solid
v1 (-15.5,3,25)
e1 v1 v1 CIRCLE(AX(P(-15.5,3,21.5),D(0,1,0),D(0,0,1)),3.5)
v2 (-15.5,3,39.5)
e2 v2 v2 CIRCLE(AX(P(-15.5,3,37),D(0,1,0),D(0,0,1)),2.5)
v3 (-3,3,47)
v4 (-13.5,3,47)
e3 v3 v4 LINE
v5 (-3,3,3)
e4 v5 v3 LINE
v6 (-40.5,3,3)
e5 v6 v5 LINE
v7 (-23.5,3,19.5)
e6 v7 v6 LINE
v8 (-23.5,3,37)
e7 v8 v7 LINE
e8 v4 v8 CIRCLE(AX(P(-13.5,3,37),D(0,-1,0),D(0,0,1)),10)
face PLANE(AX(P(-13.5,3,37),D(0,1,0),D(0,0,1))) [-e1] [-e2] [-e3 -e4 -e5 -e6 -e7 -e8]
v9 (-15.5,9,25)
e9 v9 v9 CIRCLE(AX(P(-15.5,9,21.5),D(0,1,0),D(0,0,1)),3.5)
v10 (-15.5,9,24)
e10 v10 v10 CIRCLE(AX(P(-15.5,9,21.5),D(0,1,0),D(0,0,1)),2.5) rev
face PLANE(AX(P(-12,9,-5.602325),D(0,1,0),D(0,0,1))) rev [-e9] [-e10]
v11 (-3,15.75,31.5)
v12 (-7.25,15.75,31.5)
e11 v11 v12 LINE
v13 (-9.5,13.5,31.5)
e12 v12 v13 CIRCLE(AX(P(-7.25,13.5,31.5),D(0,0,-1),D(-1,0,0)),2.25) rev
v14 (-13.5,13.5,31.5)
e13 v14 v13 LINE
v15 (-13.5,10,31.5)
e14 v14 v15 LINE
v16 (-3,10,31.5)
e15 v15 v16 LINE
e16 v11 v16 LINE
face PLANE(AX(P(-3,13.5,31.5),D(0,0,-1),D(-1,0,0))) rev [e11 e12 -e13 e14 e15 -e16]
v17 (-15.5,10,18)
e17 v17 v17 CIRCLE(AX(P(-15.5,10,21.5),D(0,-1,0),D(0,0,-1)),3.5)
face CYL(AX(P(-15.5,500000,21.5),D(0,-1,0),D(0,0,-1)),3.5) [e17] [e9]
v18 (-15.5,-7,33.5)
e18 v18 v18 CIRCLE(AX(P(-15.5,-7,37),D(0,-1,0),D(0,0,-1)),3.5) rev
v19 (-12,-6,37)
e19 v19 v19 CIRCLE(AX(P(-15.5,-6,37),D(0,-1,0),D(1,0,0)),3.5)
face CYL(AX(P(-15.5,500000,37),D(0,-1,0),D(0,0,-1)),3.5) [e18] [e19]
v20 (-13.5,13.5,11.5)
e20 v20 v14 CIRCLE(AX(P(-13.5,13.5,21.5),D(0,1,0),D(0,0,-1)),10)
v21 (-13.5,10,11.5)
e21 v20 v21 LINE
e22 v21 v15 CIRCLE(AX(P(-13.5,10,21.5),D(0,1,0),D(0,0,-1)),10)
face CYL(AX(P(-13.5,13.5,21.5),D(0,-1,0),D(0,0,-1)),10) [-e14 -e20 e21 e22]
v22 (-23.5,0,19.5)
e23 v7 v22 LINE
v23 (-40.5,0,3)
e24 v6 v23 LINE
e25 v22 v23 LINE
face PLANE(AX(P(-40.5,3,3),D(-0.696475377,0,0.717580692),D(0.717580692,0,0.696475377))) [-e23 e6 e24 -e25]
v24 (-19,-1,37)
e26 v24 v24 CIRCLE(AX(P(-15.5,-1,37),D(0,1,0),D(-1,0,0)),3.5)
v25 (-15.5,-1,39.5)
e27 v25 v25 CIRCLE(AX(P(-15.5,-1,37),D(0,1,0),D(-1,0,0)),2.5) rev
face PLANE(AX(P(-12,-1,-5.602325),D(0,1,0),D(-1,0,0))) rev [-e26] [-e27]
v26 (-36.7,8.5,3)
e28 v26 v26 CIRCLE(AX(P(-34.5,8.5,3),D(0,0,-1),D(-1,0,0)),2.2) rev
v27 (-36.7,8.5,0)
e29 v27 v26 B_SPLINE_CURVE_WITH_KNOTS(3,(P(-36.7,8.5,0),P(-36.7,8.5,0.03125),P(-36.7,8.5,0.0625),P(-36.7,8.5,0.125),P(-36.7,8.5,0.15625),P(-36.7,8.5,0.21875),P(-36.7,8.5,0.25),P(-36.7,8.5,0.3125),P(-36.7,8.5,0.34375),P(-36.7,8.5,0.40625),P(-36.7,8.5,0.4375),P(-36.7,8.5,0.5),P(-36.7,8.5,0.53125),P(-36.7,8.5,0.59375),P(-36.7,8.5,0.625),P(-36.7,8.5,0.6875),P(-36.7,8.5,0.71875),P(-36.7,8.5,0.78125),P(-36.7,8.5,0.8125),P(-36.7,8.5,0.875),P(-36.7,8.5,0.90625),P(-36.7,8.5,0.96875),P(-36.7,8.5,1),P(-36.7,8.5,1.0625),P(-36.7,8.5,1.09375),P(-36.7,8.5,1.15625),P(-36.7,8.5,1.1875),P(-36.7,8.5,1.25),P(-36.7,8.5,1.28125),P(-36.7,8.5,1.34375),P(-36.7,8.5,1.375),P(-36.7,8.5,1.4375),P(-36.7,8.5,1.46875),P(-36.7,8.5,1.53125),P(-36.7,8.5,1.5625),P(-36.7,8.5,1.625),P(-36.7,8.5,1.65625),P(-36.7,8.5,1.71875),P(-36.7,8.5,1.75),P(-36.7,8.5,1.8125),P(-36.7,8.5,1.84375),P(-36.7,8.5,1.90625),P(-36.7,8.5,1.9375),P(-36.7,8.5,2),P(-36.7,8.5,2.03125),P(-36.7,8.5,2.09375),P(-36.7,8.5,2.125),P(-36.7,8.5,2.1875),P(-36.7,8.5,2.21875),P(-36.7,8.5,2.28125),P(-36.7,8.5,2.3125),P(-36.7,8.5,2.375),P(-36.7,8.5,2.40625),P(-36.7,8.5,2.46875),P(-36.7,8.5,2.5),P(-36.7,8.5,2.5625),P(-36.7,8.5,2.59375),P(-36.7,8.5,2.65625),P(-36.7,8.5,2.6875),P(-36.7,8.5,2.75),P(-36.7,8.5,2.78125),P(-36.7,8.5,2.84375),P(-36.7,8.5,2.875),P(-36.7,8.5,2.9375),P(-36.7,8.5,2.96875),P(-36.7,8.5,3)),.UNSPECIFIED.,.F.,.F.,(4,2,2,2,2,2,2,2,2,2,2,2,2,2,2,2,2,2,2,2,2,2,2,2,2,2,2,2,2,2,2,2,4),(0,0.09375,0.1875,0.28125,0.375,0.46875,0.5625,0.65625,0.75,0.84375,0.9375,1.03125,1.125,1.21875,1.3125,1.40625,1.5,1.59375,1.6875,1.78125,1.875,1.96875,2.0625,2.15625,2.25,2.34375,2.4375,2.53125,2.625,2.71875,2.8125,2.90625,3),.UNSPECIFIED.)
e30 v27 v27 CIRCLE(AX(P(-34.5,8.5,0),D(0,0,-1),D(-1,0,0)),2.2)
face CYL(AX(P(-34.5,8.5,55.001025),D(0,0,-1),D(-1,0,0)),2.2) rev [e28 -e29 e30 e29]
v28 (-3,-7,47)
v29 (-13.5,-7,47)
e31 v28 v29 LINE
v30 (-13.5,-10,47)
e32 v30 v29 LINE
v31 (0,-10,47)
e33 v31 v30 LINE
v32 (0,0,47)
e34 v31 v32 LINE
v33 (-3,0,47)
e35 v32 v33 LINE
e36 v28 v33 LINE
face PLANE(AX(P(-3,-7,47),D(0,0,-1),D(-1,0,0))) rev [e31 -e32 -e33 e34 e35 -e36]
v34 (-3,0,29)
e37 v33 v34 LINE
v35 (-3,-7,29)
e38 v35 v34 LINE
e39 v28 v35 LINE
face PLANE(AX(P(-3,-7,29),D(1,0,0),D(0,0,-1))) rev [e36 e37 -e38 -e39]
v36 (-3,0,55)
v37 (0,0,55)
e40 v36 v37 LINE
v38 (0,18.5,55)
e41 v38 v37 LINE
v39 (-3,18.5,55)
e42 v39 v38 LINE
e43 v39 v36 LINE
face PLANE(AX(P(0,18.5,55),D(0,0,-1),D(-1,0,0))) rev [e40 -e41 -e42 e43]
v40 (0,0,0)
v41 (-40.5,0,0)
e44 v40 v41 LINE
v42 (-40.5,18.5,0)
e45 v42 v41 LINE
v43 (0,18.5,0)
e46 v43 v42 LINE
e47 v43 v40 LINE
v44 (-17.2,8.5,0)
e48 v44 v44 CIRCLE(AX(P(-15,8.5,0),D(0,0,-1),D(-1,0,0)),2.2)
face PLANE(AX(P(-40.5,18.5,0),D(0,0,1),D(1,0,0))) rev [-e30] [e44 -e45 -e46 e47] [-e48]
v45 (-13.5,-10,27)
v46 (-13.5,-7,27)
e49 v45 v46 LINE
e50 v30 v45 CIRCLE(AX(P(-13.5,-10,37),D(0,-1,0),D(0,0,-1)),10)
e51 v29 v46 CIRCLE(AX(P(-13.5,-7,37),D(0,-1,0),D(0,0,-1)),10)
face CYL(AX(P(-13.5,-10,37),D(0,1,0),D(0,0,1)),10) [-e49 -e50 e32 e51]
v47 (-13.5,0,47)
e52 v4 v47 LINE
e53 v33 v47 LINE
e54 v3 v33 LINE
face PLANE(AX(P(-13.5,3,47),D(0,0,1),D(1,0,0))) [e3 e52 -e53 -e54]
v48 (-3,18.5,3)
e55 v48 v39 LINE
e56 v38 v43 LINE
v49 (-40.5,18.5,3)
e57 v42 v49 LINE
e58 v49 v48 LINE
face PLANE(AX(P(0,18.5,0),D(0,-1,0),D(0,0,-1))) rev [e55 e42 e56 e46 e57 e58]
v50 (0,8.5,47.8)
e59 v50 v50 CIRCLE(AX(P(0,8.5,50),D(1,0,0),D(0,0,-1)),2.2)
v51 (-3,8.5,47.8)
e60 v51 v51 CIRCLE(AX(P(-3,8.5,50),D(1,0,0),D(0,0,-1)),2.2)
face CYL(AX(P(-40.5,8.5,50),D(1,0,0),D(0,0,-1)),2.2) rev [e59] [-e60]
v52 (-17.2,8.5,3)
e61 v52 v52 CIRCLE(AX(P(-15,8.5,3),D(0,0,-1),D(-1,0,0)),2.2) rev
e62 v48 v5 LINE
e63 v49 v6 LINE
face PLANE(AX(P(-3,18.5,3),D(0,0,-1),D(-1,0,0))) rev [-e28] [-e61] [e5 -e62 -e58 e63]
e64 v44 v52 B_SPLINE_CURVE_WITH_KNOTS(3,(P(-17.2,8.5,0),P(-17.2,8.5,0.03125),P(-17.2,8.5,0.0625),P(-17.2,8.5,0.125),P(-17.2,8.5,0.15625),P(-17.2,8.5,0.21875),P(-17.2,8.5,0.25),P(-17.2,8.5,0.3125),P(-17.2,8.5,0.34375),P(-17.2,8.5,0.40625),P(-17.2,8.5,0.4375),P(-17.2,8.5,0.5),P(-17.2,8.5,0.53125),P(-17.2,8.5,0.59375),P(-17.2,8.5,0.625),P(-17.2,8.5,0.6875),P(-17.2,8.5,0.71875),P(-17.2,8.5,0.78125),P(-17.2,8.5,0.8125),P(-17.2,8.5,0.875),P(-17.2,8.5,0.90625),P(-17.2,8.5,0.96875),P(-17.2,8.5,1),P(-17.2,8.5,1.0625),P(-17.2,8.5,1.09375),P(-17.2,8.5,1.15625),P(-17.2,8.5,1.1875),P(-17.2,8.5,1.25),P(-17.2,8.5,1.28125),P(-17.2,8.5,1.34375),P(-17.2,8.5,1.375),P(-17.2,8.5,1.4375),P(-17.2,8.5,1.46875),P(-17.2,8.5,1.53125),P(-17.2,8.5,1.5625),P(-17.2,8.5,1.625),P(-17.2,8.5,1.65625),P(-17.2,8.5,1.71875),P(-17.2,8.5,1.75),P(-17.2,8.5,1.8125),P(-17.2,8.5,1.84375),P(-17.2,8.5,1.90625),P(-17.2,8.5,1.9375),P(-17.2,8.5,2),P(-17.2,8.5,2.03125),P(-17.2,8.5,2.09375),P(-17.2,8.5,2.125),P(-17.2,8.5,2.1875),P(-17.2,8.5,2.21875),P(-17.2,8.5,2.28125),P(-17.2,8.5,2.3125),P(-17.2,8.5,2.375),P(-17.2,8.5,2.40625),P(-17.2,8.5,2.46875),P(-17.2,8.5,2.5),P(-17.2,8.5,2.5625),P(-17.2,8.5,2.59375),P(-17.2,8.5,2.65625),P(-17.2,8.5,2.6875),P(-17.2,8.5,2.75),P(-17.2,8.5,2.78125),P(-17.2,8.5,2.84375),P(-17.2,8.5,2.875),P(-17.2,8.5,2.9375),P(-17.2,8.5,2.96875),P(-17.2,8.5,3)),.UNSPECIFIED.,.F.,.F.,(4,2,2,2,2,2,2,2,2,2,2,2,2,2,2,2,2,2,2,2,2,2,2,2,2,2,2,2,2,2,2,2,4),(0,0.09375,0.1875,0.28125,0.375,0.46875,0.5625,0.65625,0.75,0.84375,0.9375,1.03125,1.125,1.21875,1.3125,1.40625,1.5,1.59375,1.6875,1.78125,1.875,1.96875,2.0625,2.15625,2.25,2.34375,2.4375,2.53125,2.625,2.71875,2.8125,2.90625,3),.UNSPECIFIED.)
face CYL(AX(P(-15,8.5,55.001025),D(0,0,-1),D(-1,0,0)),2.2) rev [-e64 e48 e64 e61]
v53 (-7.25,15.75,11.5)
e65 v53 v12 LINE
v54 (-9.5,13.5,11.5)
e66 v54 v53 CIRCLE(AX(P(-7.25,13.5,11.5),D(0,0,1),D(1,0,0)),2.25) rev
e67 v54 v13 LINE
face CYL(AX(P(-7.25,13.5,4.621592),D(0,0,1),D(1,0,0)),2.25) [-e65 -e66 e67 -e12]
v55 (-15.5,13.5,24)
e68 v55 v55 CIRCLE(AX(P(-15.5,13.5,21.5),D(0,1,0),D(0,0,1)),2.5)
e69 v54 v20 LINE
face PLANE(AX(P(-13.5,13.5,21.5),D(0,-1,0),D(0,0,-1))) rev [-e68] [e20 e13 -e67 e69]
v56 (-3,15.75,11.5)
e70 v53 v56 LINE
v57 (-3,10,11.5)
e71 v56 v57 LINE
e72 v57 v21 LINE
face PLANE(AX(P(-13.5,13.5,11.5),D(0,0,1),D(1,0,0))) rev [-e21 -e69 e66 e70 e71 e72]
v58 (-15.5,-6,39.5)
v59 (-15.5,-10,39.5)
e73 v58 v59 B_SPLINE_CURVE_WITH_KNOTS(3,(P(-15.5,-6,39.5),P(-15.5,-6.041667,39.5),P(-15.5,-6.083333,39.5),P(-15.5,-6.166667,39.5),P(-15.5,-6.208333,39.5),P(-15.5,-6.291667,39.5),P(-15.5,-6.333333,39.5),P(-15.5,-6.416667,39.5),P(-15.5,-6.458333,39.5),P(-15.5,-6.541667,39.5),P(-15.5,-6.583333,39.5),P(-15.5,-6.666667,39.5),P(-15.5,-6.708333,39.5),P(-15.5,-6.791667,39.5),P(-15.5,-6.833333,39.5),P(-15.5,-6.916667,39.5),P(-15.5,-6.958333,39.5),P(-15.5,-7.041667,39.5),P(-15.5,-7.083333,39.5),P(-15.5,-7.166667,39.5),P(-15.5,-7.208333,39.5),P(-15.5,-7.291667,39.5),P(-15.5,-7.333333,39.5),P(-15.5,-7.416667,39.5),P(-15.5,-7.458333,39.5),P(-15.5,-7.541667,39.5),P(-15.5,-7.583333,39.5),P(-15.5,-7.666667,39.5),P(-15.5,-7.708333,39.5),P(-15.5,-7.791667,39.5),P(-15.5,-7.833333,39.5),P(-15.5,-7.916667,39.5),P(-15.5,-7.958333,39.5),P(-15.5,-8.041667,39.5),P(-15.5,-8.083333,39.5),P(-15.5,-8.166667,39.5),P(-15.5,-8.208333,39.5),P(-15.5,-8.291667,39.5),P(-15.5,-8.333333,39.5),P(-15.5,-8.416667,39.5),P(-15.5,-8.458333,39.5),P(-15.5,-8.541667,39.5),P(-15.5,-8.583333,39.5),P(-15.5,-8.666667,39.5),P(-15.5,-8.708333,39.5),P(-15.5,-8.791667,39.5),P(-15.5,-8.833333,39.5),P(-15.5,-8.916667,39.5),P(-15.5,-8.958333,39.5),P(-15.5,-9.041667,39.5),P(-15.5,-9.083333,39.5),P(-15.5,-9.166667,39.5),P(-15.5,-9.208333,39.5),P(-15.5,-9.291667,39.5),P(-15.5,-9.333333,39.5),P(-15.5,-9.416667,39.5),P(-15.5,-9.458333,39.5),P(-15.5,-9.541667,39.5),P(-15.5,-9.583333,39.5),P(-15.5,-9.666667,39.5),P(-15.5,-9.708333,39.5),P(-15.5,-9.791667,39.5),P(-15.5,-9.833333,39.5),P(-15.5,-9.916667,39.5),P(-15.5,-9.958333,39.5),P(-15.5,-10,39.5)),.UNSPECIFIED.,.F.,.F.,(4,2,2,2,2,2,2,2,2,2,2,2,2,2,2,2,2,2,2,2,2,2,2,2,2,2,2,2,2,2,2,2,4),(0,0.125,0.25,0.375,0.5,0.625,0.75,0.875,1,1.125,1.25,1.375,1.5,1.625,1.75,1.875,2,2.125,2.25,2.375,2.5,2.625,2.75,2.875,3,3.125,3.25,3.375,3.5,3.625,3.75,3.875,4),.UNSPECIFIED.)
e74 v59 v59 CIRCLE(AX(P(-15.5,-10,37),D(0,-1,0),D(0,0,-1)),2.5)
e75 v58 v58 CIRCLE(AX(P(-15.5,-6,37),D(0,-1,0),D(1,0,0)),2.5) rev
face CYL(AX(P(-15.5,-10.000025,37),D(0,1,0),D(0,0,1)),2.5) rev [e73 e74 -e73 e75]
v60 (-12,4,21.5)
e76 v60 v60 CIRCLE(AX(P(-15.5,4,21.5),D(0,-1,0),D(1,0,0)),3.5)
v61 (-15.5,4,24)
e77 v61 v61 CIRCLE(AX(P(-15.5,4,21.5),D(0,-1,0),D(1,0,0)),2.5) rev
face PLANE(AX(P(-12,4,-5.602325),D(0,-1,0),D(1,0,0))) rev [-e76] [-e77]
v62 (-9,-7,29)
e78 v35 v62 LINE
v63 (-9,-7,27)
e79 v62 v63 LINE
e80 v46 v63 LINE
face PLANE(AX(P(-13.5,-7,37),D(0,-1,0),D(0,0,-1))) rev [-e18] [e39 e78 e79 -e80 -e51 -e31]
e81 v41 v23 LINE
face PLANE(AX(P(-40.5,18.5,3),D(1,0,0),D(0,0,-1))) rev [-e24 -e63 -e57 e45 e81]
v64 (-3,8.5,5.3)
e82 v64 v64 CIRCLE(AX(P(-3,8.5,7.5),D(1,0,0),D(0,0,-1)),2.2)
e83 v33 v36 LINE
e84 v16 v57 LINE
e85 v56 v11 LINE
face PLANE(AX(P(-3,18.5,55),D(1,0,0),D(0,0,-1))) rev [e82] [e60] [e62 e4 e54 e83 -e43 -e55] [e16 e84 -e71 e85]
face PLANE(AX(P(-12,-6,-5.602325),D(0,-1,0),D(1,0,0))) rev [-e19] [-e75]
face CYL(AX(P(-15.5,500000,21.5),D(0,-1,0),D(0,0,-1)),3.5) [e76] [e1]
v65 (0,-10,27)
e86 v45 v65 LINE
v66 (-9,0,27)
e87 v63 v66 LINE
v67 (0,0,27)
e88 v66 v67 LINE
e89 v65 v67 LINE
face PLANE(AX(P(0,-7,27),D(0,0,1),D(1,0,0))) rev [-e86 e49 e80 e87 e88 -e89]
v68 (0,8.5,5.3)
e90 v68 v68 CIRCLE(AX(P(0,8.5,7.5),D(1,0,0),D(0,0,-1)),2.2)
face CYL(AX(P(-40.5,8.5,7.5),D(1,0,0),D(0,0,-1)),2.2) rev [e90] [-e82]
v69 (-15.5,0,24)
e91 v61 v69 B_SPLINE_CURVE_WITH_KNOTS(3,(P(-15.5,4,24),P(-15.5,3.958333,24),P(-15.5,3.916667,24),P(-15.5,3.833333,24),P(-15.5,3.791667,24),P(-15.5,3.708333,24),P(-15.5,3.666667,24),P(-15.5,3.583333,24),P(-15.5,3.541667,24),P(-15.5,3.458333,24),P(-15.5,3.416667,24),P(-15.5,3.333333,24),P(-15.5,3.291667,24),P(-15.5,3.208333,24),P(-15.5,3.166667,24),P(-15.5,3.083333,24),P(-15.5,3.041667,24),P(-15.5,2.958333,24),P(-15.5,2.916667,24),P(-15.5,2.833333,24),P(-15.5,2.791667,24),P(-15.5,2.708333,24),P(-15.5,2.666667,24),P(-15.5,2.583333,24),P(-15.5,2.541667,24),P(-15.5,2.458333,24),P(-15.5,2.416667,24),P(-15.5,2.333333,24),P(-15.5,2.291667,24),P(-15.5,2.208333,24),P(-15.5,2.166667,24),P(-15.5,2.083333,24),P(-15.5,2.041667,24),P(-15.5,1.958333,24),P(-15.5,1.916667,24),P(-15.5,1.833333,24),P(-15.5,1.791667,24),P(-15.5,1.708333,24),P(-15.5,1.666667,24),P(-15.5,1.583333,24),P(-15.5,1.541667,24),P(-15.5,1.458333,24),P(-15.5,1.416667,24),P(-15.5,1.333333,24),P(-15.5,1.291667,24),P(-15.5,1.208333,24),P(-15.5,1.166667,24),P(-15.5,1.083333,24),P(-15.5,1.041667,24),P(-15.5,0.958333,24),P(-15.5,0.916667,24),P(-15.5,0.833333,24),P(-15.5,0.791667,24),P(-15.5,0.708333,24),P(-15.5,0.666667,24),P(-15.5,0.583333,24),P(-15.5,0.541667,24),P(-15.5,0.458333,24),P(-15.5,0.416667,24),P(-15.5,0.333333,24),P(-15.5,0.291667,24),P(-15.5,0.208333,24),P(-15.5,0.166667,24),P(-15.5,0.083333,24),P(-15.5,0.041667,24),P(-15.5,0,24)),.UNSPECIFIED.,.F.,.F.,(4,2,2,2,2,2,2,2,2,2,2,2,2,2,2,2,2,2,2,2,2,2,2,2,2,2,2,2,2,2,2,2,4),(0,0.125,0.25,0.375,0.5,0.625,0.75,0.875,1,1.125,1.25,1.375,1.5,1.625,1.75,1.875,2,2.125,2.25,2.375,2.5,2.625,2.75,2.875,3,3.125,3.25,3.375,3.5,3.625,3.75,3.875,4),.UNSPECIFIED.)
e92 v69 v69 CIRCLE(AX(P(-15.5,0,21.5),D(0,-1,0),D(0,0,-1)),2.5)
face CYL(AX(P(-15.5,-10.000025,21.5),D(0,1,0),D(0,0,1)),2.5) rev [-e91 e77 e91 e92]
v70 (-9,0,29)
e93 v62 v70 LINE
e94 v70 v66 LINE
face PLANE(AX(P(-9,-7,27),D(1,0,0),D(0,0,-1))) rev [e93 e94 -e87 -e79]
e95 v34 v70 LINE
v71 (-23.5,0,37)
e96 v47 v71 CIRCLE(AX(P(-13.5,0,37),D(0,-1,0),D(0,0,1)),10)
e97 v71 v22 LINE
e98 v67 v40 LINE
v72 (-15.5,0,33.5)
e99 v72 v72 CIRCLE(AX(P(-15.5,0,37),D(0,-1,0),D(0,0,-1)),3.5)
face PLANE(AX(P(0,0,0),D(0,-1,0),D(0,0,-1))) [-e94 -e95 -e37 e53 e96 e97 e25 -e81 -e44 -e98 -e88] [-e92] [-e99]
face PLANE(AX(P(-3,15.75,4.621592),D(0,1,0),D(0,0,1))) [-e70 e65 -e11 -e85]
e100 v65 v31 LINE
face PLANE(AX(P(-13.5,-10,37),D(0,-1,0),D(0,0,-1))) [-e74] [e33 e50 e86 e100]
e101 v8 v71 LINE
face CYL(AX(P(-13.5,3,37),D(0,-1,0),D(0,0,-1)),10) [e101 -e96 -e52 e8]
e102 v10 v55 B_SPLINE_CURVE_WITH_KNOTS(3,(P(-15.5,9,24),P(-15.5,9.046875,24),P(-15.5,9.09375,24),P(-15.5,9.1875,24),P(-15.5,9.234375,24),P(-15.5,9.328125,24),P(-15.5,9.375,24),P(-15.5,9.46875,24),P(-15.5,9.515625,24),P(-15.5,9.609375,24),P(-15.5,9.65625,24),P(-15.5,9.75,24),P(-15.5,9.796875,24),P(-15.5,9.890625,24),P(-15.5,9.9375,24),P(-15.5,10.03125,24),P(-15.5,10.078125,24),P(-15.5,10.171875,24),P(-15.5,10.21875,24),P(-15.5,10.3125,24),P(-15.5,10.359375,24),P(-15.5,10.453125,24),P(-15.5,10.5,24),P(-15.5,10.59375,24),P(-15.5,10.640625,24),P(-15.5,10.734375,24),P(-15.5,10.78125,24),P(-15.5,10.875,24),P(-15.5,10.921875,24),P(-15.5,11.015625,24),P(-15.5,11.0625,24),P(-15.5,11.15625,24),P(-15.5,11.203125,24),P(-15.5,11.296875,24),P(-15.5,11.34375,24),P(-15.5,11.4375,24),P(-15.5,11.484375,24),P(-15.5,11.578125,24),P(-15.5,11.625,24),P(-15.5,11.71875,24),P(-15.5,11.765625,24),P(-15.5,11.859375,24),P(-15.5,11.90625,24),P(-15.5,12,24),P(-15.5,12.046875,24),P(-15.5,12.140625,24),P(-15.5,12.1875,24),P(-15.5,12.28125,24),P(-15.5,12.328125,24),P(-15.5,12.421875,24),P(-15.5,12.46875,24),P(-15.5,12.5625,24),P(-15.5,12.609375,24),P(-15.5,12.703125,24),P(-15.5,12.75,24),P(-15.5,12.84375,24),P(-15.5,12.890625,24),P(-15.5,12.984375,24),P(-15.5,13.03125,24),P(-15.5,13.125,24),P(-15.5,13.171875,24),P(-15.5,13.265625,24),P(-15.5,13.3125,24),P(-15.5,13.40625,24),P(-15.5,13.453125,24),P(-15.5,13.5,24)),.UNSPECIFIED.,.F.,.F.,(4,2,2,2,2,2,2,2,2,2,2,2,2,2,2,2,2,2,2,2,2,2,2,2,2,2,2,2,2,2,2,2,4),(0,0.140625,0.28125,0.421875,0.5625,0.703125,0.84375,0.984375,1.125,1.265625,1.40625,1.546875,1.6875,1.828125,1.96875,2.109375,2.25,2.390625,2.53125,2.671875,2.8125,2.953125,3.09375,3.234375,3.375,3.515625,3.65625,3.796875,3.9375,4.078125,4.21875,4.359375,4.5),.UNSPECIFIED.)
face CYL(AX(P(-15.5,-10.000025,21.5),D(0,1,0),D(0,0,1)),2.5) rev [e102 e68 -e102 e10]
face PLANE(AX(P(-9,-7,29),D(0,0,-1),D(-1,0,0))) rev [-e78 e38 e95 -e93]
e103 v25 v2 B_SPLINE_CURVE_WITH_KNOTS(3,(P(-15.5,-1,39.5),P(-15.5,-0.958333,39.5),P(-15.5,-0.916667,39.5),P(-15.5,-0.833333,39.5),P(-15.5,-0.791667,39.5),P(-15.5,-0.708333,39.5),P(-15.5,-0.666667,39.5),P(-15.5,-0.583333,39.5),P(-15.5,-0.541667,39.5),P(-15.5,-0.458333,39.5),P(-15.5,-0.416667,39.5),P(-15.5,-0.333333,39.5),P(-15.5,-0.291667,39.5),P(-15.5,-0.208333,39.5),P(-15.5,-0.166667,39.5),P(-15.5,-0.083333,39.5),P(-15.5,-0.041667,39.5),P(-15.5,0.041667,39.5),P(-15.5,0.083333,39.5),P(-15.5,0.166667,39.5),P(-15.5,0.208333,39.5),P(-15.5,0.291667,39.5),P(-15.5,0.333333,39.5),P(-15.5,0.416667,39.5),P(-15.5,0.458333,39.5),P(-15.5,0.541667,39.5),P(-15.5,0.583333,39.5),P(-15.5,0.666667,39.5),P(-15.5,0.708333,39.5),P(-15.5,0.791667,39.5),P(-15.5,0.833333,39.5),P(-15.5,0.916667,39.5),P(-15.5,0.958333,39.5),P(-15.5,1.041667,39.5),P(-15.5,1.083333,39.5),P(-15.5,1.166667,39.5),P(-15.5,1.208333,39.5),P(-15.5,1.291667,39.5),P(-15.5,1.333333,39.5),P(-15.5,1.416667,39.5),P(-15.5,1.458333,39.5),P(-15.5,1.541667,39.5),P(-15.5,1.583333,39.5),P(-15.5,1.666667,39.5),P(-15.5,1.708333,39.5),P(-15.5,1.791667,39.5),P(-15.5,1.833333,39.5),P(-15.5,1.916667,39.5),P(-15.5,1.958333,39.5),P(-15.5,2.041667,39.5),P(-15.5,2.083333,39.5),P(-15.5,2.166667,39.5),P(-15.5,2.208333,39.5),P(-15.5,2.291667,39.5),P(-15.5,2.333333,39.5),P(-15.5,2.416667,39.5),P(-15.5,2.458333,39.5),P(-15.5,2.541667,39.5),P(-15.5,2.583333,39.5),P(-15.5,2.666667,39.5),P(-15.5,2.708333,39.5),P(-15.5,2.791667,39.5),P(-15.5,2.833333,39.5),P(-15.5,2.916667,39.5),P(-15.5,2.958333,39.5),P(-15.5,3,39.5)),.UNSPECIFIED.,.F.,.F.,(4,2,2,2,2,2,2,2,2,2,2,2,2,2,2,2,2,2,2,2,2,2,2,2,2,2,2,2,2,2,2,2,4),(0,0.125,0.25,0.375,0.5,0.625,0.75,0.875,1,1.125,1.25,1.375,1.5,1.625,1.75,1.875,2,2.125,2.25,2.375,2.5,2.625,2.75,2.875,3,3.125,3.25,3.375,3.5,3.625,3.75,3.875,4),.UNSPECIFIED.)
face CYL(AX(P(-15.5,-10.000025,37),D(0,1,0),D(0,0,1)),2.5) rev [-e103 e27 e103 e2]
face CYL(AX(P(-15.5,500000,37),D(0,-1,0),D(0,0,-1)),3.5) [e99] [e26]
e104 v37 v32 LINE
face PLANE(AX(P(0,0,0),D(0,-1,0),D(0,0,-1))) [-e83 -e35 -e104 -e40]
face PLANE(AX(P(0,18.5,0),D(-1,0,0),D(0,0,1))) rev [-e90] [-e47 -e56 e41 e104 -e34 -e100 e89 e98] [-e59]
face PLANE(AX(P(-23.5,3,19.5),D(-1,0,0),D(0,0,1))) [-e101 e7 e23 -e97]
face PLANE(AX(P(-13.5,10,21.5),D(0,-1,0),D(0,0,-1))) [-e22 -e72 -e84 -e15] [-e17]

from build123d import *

# Parameters (mm, degrees)
BOSS_EXTRUDE1_DEPTH = 18.5
BOSS_EXTRUDE2_DEPTH = 3
BOSS_EXTRUDE3_START = 7
BOSS_EXTRUDE3_DEPTH = 3.5
SKETCH4_W           = 6.5
SKETCH4_H           = 2.25
BOSS_EXTRUDE4_DEPTH = 20
FILLET1_R           = 2.25
BOSS_EXTRUDE5_DEPTH = 7
BOSS_EXTRUDE6_START = 3
BOSS_EXTRUDE6_DEPTH = 3
SKETCH7_R           = 2.5
CUT_EXTRUDE1_DEPTH  = 73.232264259
SKETCH8_R           = 2.2
CUT_EXTRUDE2_DEPTH  = 71.763691255
CUT_EXTRUDE3_REACH  = 72.764
SKETCH9_R           = 2.2
BOSS_EXTRUDE7_REACH = 74.907
SKETCH10_R          = 3.5
SKETCH10_R_2        = 2.5
BOSS_EXTRUDE8_REACH = 72.039
SKETCH11_R          = 3.5
SKETCH11_R_2        = 2.5
CUT_EXTRUDE4_REACH  = 66.742
SKETCH12_W          = 7
SKETCH12_H          = 5


with BuildPart() as part:
    # Sketch1 → Boss-Extrude1 (new body)
    with BuildSketch(Plane(origin=(0, 0, 0), x_dir=(1, 0, 0), z_dir=(0, 1, 0))):
        Polygon((-40.5, 0), (0, 0), (0, -55), (-3, -55), (-3, -3), (-40.5, -3), align=None)
    extrude(amount=BOSS_EXTRUDE1_DEPTH)

    # Sketch2 → Boss-Extrude2 (add)
    with BuildSketch(Plane.XZ):
        with BuildLine():
            Line((-40.5, 3), (-23.5, 19.5))
            Line((-23.5, 19.5), (-23.5, 37))
            ThreePointArc((-23.5, 37), (-20.571067812, 44.071067812), (-13.5, 47))
            Line((-13.5, 47), (-3, 47))
            Line((-3, 47), (-3, 3))
            Line((-3, 3), (-40.5, 3))
        make_face()
    extrude(amount=-BOSS_EXTRUDE2_DEPTH)

    # Sketch3 → Boss-Extrude3 (add)
    with BuildSketch(Plane(origin=(0, 3, 0), x_dir=(1, 0, 0), z_dir=(0, 1, 0)).offset(BOSS_EXTRUDE3_START)):
        with BuildLine():
            Line((-3, -31.5), (-13.5, -31.5))
            ThreePointArc((-13.5, -31.5), (-23.5, -21.5), (-13.5, -11.5))
            Line((-13.5, -11.5), (-3, -11.5))
            Line((-3, -11.5), (-3, -31.5))
        make_face()
    extrude(amount=BOSS_EXTRUDE3_DEPTH)

    # Sketch4 → Boss-Extrude4 (add)
    with BuildSketch(Plane.XY.offset(31.5)):
        with Locations((-6.25, 14.625)):
            Rectangle(SKETCH4_W, SKETCH4_H)
    extrude(amount=-BOSS_EXTRUDE4_DEPTH)

    # Fillet1
    fillet1_edges = [part.edges().sort_by_distance(p)[0] for p in [
        (-9.5, 15.75, 21.5),
    ]]
    fillet(fillet1_edges, radius=FILLET1_R - 0.0001)  # a hair under: the kernel refuses the full size

    # Sketch5 → Boss-Extrude5 (add)
    with BuildSketch(Plane.XZ):
        Polygon((0, 47), (0, 27), (-9, 27), (-9, 29), (-3, 29), (-3, 47), align=None)
    extrude(amount=BOSS_EXTRUDE5_DEPTH)

    # Sketch6 → Boss-Extrude6 (add)
    with BuildSketch(Plane.XZ.offset(7).offset(BOSS_EXTRUDE6_START)):
        with BuildLine():
            Line((0, 27), (0, 47))
            Line((0, 47), (-13.5, 47))
            ThreePointArc((-13.5, 47), (-23.5, 37), (-13.5, 27))
            Line((-13.5, 27), (0, 27))
        make_face()
    extrude(amount=-BOSS_EXTRUDE6_DEPTH)

    # Sketch7 → Cut-Extrude1 (cut, through all)
    with BuildSketch(Plane(origin=(0, 13.5, 0), x_dir=(1, 0, 0), z_dir=(0, 1, 0))):
        with Locations(Location((-15.5, -21.5, 0), (0, 0, 270))):
            Circle(SKETCH7_R)
        with Locations(Location((-15.5, -37, 0), (0, 0, 270))):
            Circle(SKETCH7_R)
    extrude(amount=-CUT_EXTRUDE1_DEPTH, mode=Mode.SUBTRACT)

    # Sketch8 → Cut-Extrude2 (cut, through all)
    with BuildSketch(Plane(origin=(0, 0, 0), x_dir=(0, 0, -1), z_dir=(1, 0, 0))):
        with Locations((-50, 8.5)):
            Circle(SKETCH8_R)
        with Locations((-7.5, 8.5)):
            Circle(SKETCH8_R)
    extrude(amount=-CUT_EXTRUDE2_DEPTH, mode=Mode.SUBTRACT)

    # Sketch9 → Cut-Extrude3 (cut, up to next)
    with BuildSketch(Plane(origin=(0, 0, 0), x_dir=(-1, 0, 0), z_dir=(0, 0, -1)), mode=Mode.PRIVATE) as cut_extrude3_sk1:
        with Locations((15, 8.5)):
            Circle(SKETCH9_R)
    cut_extrude3_tool1 = extrude(cut_extrude3_sk1.sketch, amount=-CUT_EXTRUDE3_REACH, mode=Mode.PRIVATE) & part.part
    # Sketch9 → Cut-Extrude3 (cut, up to next)
    with BuildSketch(Plane(origin=(0, 0, 0), x_dir=(-1, 0, 0), z_dir=(0, 0, -1)), mode=Mode.PRIVATE) as cut_extrude3_sk2:
        with Locations((34.5, 8.5)):
            Circle(SKETCH9_R)
    cut_extrude3_tool2 = extrude(cut_extrude3_sk2.sketch, amount=-CUT_EXTRUDE3_REACH, mode=Mode.PRIVATE) & part.part
    add(cut_extrude3_tool1.solids().sort_by_distance((-15, 8.5, 0))[0], mode=Mode.SUBTRACT)
    add(cut_extrude3_tool2.solids().sort_by_distance((-34.5, 8.5, 0))[0], mode=Mode.SUBTRACT)

    # Sketch10 → Boss-Extrude7 (add, up to next)
    with BuildSketch(Plane(origin=(0, -7, 0), x_dir=(1, 0, 0), z_dir=(0, 1, 0)), mode=Mode.PRIVATE) as boss_extrude7_sk1:
        with Locations(Location((-15.5, -37, 0), (0, 0, 90))):
            Circle(SKETCH10_R)
        with Locations(Location((-15.5, -37, 0), (0, 0, 270))):
            Circle(SKETCH10_R_2, mode=Mode.SUBTRACT)
    boss_extrude7_tool1 = extrude(boss_extrude7_sk1.sketch, amount=BOSS_EXTRUDE7_REACH, mode=Mode.PRIVATE) - part.part
    add(boss_extrude7_tool1.solids().sort_by_distance((-15.5, -7, 40.401005))[0])

    # Sketch11 → Boss-Extrude8 (add, up to next)
    with BuildSketch(Plane(origin=(0, 3, 0), x_dir=(1, 0, 0), z_dir=(0, 1, 0)), mode=Mode.PRIVATE) as boss_extrude8_sk1:
        with Locations(Location((-15.5, -21.5, 0), (0, 0, 90))):
            Circle(SKETCH11_R)
        with Locations(Location((-15.5, -21.5, 0), (0, 0, 270))):
            Circle(SKETCH11_R_2, mode=Mode.SUBTRACT)
    boss_extrude8_tool1 = extrude(boss_extrude8_sk1.sketch, amount=BOSS_EXTRUDE8_REACH, mode=Mode.PRIVATE) - part.part
    add(boss_extrude8_tool1.solids().sort_by_distance((-15.5, 3, 24.901005))[0])

    # Cut-Extrude4: up to this face of the body (flat: up to its plane)
    cut_extrude4_end = Plane(part.part.faces().sort_by_distance((-21.584376674, 10.874217494, 3))[0])
    # Sketch12 → Cut-Extrude4 (cut, up to the picked face)
    with BuildSketch(Plane.XY.offset(47), mode=Mode.PRIVATE) as cut_extrude4_sk1:
        with Locations((-15.5, -3.5)):
            Rectangle(SKETCH12_W, SKETCH12_H)
    cut_extrude4_tool1 = split(extrude(cut_extrude4_sk1.sketch, amount=-CUT_EXTRUDE4_REACH, mode=Mode.PRIVATE), bisect_by=cut_extrude4_end, keep=Keep.BOTH, mode=Mode.PRIVATE)
    # Sketch12 → Cut-Extrude4 (cut, up to the picked face)
    with BuildSketch(Plane.XY.offset(47), mode=Mode.PRIVATE) as cut_extrude4_sk2:
        with Locations((-15.5, 6.5)):
            Rectangle(SKETCH12_W, SKETCH12_H)
    cut_extrude4_tool2 = split(extrude(cut_extrude4_sk2.sketch, amount=-CUT_EXTRUDE4_REACH, mode=Mode.PRIVATE), bisect_by=cut_extrude4_end, keep=Keep.BOTH, mode=Mode.PRIVATE)
    add(cut_extrude4_tool1.solids().sort_by(Axis((-15.5, -3.5, 47), (0, 0, -1)))[0], mode=Mode.SUBTRACT)
    add(cut_extrude4_tool2.solids().sort_by(Axis((-15.5, 6.5, 47), (0, 0, -1)))[0], mode=Mode.SUBTRACT)


solid = part.part
